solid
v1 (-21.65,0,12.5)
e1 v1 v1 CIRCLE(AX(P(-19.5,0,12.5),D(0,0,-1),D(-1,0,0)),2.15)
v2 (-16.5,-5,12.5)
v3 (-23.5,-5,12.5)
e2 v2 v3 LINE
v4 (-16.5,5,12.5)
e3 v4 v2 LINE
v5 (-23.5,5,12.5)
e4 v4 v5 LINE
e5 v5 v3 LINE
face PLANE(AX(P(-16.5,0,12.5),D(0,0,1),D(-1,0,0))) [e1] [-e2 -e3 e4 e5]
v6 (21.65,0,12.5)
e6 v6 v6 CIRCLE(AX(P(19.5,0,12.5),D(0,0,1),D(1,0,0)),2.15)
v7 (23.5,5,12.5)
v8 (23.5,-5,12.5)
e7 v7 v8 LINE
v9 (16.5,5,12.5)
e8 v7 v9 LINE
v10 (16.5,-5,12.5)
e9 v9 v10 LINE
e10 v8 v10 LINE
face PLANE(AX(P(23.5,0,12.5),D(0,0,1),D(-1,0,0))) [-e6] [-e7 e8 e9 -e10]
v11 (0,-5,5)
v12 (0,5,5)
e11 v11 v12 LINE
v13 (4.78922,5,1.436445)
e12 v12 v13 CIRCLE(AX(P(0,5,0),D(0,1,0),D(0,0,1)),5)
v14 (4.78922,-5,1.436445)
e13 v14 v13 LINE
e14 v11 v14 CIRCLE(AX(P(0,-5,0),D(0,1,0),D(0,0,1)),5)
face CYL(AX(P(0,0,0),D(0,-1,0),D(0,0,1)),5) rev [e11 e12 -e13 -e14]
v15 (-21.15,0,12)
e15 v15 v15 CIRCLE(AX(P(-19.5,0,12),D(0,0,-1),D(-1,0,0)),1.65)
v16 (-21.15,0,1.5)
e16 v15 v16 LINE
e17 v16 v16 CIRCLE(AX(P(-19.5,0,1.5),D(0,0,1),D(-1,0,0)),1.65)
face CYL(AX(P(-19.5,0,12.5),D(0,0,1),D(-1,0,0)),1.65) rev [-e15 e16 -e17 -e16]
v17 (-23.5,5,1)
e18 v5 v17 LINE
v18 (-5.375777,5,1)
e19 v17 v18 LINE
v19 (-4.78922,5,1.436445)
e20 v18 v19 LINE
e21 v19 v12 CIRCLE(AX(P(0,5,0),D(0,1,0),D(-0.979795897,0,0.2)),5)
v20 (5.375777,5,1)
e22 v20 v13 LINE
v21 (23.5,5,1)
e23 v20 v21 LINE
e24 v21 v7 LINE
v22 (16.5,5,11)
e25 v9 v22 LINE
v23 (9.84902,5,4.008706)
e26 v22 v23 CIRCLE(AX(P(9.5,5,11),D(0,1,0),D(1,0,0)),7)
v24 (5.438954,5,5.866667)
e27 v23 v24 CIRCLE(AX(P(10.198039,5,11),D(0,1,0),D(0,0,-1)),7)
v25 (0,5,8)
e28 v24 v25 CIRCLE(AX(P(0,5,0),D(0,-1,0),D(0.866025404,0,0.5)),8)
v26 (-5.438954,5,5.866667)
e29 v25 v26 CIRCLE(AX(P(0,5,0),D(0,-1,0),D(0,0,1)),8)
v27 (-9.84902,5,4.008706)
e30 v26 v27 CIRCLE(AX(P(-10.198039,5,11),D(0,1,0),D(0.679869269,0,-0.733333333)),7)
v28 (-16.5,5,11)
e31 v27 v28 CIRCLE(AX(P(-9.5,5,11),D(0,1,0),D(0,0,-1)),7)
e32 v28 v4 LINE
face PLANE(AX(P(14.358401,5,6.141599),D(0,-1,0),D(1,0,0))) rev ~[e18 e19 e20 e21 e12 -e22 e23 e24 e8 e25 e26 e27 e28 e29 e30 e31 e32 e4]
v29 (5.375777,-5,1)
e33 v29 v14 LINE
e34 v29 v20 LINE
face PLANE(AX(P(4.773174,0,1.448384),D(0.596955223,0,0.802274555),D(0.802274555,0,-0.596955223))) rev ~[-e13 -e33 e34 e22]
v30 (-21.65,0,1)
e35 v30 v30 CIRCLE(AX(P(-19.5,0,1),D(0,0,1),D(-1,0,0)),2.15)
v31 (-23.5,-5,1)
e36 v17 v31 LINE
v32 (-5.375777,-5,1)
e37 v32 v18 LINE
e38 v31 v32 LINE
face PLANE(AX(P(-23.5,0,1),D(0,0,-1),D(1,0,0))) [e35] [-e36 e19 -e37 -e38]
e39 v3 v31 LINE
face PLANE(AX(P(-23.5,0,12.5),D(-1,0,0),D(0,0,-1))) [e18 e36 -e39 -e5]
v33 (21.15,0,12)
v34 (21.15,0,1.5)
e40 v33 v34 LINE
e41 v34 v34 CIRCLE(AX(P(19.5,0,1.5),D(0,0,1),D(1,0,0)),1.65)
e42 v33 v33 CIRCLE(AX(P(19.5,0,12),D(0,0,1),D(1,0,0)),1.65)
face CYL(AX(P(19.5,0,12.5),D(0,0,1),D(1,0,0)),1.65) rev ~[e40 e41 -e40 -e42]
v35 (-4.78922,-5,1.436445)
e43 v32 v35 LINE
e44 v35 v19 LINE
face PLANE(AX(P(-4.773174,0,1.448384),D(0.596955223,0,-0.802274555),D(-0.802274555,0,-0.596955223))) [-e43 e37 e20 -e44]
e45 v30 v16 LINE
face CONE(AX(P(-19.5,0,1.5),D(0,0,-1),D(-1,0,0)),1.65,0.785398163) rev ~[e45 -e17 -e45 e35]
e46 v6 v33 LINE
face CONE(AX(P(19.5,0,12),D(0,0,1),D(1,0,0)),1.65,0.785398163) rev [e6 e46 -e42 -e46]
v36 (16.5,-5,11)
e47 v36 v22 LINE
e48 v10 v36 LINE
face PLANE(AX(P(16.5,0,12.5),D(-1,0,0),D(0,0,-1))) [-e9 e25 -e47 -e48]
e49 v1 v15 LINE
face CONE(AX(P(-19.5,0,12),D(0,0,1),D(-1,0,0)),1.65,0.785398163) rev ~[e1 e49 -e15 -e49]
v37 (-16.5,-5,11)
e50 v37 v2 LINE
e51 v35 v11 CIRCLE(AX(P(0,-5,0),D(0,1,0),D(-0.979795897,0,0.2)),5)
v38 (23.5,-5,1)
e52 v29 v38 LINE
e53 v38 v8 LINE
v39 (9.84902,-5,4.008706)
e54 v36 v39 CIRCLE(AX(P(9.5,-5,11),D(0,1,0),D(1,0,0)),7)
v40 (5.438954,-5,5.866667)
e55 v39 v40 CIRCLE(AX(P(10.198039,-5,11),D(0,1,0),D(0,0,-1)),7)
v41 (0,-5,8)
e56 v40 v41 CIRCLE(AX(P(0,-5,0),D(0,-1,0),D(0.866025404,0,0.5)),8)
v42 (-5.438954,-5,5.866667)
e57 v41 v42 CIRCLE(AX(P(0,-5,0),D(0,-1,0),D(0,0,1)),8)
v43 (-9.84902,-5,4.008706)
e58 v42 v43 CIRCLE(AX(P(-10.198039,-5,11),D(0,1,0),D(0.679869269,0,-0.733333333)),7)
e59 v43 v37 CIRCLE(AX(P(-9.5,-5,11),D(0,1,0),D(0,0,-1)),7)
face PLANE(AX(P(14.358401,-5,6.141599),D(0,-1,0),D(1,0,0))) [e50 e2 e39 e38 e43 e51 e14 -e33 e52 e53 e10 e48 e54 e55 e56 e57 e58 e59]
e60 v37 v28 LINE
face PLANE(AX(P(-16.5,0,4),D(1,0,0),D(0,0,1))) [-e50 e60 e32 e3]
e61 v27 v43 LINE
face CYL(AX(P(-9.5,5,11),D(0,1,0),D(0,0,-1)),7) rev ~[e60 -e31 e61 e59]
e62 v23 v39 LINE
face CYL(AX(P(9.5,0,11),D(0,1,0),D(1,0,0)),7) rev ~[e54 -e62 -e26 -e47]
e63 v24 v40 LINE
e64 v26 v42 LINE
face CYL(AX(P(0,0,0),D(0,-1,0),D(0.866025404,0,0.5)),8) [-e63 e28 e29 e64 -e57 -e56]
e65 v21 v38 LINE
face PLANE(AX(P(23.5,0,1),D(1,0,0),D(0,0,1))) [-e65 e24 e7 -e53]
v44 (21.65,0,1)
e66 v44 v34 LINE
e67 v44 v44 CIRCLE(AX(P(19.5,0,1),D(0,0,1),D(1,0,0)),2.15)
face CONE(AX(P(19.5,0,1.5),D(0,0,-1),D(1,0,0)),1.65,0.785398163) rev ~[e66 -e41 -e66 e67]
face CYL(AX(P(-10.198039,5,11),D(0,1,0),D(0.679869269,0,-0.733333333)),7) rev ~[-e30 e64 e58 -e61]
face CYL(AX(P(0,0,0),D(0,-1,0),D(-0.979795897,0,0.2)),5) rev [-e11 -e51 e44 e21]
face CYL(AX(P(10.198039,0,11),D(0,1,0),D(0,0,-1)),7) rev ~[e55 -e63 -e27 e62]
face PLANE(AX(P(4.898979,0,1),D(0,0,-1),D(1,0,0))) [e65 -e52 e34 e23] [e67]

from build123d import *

# Parameters (mm, degrees)
F1_DEPTH    = 5
F2_T1_DEPTH = 5
F2_T3_DEPTH = 5
F3_T1_DEPTH = 6.2324692544
F3_T3_DEPTH = 6.2324692544
F4_R        = 1.65
F5_DEPTH    = 11.501
F6_SIZE     = 0.5


# Not quite as in the source:
# - a fillet or chamfer that OpenCascade refuses, or shapes differently, is made with other operations: its cross-section is extruded or revolved along the edge and cut away or added
# - a pattern or mirror of a feature is missing from the dataset's text; its kind, count and spacing are read off the source's solid


with BuildPart() as f1:
    # F0 (on Front) → F1 (new body, symmetric)
    with BuildSketch(Plane.XZ):
        with BuildLine():
            Line((4.8989794856, 1), (23.5, 1))
            Line((23.5, 1), (23.5, 12.5))
            Line((23.5, 12.5), (16.5, 12.5))
            Line((16.5, 12.5), (16.5, 4))
            Line((16.5, 4), (6.9282032303, 4))
            ThreePointArc((6.9282032303, 4), (4, 6.9282032303), (0, 8))
            ThreePointArc((0, 8), (-4, 6.9282032303), (-6.9282032303, 4))
            Line((-6.9282032303, 4), (-16.5, 4))
            Line((-16.5, 4), (-16.5, 12.5))
            Line((-16.5, 12.5), (-23.5, 12.5))
            Line((-23.5, 12.5), (-23.5, 1))
            Line((-23.5, 1), (-4.8989794856, 1))
            ThreePointArc((-4.8989794856, 1), (-3.1622776602, 3.8729833462), (0, 5))
            ThreePointArc((0, 5), (3.1622776602, 3.8729833462), (4.8989794856, 1))
        make_face()
    extrude(amount=F1_DEPTH, both=True)

    # F2: fillet of radius 7 on 8 edges, made by hand

    # F2_s2 → F2_t1 (join)
    with BuildSketch(Plane.XZ.offset(-5)):
        with BuildLine():
            ThreePointArc((16.5, 11), (14.4497474683, 6.0502525317), (9.5, 4))
            Line((9.5, 4), (16.5, 4))
            Line((16.5, 4), (16.5, 11))
        make_face()
        with BuildLine():
            ThreePointArc((10.1980390272, 4), (7.6420004255, 4.4833546462), (5.4389541478, 5.8666666667))
            ThreePointArc((5.4389541478, 5.8666666667), (6.2536194731, 4.989212712), (6.9282032303, 4))
            Line((6.9282032303, 4), (10.1980390272, 4))
        make_face()
        with BuildLine():
            ThreePointArc((-5.4389541478, 5.8666666667), (-7.6420004255, 4.4833546462), (-10.1980390272, 4))
            Line((-10.1980390272, 4), (-6.9282032303, 4))
            ThreePointArc((-6.9282032303, 4), (-6.2536194731, 4.989212712), (-5.4389541478, 5.8666666667))
        make_face()
        with BuildLine():
            ThreePointArc((-9.5, 4), (-14.4497474683, 6.0502525317), (-16.5, 11))
            Line((-16.5, 11), (-16.5, 4))
            Line((-16.5, 4), (-9.5, 4))
        make_face()
    extrude(amount=F2_T1_DEPTH)

    # F2_s4 → F2_t3 (join)
    with BuildSketch(Plane.XZ):
        with BuildLine():
            ThreePointArc((16.5, 11), (14.4497474683, 6.0502525317), (9.5, 4))
            Line((9.5, 4), (16.5, 4))
            Line((16.5, 4), (16.5, 11))
        make_face()
        with BuildLine():
            ThreePointArc((10.1980390272, 4), (7.6420004255, 4.4833546462), (5.4389541478, 5.8666666667))
            ThreePointArc((5.4389541478, 5.8666666667), (6.2536194731, 4.989212712), (6.9282032303, 4))
            Line((6.9282032303, 4), (10.1980390272, 4))
        make_face()
        with BuildLine():
            ThreePointArc((-5.4389541478, 5.8666666667), (-7.6420004255, 4.4833546462), (-10.1980390272, 4))
            Line((-10.1980390272, 4), (-6.9282032303, 4))
            ThreePointArc((-6.9282032303, 4), (-6.2536194731, 4.989212712), (-5.4389541478, 5.8666666667))
        make_face()
        with BuildLine():
            ThreePointArc((-9.5, 4), (-14.4497474683, 6.0502525317), (-16.5, 11))
            Line((-16.5, 11), (-16.5, 4))
            Line((-16.5, 4), (-9.5, 4))
        make_face()
    extrude(amount=F2_T3_DEPTH)

    # F3: chamfer of 0.5 on 4 edges, made by hand

    # F3_s2 → F3_t1 (cut)
    with BuildSketch(Plane.XZ.offset(-6.2324692544)):
        with BuildLine():
            Line((-4.7731743681, 1.4483837223), (-5.3918225964, 0.9880608955))
            Line((-5.3918225964, 0.9880608955), (-5.3918225964, 0.9780608955))
            ThreePointArc((-5.3918225964, 0.9780608955), (-5.145401041, 0.99), (-4.8989794856, 0.99))
            Line((-4.8989794856, 0.99), (-4.8891815266, 0.998))
            ThreePointArc((-4.8891815266, 0.998), (-4.8374189809, 1.2245315852), (-4.7635959284, 1.445510833))
            Line((-4.7635959284, 1.445510833), (-4.7731743681, 1.4483837223))
        make_face()
        with BuildLine():
            Line((4.7731743681, 1.4483837223), (5.3918225964, 0.9880608955))
            Line((5.3918225964, 0.9880608955), (5.3918225964, 0.9780608955))
            ThreePointArc((5.3918225964, 0.9780608955), (5.145401041, 0.99), (4.8989794856, 0.99))
            Line((4.8989794856, 0.99), (4.8891815266, 0.998))
            ThreePointArc((4.8891815266, 0.998), (4.8374189809, 1.2245315852), (4.7635959284, 1.445510833))
            Line((4.7635959284, 1.445510833), (4.7731743681, 1.4483837223))
        make_face()
    extrude(amount=F3_T1_DEPTH, mode=Mode.SUBTRACT)

    # F3_s4 → F3_t3 (cut)
    with BuildSketch(Plane.XZ):
        with BuildLine():
            Line((-4.7731743681, 1.4483837223), (-5.3918225964, 0.9880608955))
            Line((-5.3918225964, 0.9880608955), (-5.3918225964, 0.9780608955))
            ThreePointArc((-5.3918225964, 0.9780608955), (-5.145401041, 0.99), (-4.8989794856, 0.99))
            Line((-4.8989794856, 0.99), (-4.8891815266, 0.998))
            ThreePointArc((-4.8891815266, 0.998), (-4.8374189809, 1.2245315852), (-4.7635959284, 1.445510833))
            Line((-4.7635959284, 1.445510833), (-4.7731743681, 1.4483837223))
        make_face()
        with BuildLine():
            Line((4.7731743681, 1.4483837223), (5.3918225964, 0.9880608955))
            Line((5.3918225964, 0.9880608955), (5.3918225964, 0.9780608955))
            ThreePointArc((5.3918225964, 0.9780608955), (5.145401041, 0.99), (4.8989794856, 0.99))
            Line((4.8989794856, 0.99), (4.8891815266, 0.998))
            ThreePointArc((4.8891815266, 0.998), (4.8374189809, 1.2245315852), (4.7635959284, 1.445510833))
            Line((4.7635959284, 1.445510833), (4.7731743681, 1.4483837223))
        make_face()
    extrude(amount=F3_T3_DEPTH, mode=Mode.SUBTRACT)

    # F4 (on face) → F5 (cut, through all)
    with BuildSketch(Plane.XY.offset(12.5)):
        with Locations((19.5, 0)):
            Circle(F4_R)
    f5 = extrude(amount=-F5_DEPTH, mode=Mode.SUBTRACT)

    # F5_copies: F5 across plane
    add(f5.mirror(Plane(origin=(0, 0, 0), x_dir=(0, 0, -1), z_dir=(-1, 0, 0))), mode=Mode.SUBTRACT)

    # F6
    f6_edges = [f1.edges().sort_by_distance(p)[0] for p in [
        (19.5, 1.65, 12.5),
        (19.5, -1.65, 12.5),
        (19.5, 1.65, 1),
        (-19.5, 1.65, 1),
        (-19.5, 1.65, 12.5),
        (19.5, -1.65, 1),
        (-19.5, -1.65, 1),
        (-19.5, -1.65, 12.5),
    ]]
    chamfer(f6_edges, length=F6_SIZE)


solid = f1.part
